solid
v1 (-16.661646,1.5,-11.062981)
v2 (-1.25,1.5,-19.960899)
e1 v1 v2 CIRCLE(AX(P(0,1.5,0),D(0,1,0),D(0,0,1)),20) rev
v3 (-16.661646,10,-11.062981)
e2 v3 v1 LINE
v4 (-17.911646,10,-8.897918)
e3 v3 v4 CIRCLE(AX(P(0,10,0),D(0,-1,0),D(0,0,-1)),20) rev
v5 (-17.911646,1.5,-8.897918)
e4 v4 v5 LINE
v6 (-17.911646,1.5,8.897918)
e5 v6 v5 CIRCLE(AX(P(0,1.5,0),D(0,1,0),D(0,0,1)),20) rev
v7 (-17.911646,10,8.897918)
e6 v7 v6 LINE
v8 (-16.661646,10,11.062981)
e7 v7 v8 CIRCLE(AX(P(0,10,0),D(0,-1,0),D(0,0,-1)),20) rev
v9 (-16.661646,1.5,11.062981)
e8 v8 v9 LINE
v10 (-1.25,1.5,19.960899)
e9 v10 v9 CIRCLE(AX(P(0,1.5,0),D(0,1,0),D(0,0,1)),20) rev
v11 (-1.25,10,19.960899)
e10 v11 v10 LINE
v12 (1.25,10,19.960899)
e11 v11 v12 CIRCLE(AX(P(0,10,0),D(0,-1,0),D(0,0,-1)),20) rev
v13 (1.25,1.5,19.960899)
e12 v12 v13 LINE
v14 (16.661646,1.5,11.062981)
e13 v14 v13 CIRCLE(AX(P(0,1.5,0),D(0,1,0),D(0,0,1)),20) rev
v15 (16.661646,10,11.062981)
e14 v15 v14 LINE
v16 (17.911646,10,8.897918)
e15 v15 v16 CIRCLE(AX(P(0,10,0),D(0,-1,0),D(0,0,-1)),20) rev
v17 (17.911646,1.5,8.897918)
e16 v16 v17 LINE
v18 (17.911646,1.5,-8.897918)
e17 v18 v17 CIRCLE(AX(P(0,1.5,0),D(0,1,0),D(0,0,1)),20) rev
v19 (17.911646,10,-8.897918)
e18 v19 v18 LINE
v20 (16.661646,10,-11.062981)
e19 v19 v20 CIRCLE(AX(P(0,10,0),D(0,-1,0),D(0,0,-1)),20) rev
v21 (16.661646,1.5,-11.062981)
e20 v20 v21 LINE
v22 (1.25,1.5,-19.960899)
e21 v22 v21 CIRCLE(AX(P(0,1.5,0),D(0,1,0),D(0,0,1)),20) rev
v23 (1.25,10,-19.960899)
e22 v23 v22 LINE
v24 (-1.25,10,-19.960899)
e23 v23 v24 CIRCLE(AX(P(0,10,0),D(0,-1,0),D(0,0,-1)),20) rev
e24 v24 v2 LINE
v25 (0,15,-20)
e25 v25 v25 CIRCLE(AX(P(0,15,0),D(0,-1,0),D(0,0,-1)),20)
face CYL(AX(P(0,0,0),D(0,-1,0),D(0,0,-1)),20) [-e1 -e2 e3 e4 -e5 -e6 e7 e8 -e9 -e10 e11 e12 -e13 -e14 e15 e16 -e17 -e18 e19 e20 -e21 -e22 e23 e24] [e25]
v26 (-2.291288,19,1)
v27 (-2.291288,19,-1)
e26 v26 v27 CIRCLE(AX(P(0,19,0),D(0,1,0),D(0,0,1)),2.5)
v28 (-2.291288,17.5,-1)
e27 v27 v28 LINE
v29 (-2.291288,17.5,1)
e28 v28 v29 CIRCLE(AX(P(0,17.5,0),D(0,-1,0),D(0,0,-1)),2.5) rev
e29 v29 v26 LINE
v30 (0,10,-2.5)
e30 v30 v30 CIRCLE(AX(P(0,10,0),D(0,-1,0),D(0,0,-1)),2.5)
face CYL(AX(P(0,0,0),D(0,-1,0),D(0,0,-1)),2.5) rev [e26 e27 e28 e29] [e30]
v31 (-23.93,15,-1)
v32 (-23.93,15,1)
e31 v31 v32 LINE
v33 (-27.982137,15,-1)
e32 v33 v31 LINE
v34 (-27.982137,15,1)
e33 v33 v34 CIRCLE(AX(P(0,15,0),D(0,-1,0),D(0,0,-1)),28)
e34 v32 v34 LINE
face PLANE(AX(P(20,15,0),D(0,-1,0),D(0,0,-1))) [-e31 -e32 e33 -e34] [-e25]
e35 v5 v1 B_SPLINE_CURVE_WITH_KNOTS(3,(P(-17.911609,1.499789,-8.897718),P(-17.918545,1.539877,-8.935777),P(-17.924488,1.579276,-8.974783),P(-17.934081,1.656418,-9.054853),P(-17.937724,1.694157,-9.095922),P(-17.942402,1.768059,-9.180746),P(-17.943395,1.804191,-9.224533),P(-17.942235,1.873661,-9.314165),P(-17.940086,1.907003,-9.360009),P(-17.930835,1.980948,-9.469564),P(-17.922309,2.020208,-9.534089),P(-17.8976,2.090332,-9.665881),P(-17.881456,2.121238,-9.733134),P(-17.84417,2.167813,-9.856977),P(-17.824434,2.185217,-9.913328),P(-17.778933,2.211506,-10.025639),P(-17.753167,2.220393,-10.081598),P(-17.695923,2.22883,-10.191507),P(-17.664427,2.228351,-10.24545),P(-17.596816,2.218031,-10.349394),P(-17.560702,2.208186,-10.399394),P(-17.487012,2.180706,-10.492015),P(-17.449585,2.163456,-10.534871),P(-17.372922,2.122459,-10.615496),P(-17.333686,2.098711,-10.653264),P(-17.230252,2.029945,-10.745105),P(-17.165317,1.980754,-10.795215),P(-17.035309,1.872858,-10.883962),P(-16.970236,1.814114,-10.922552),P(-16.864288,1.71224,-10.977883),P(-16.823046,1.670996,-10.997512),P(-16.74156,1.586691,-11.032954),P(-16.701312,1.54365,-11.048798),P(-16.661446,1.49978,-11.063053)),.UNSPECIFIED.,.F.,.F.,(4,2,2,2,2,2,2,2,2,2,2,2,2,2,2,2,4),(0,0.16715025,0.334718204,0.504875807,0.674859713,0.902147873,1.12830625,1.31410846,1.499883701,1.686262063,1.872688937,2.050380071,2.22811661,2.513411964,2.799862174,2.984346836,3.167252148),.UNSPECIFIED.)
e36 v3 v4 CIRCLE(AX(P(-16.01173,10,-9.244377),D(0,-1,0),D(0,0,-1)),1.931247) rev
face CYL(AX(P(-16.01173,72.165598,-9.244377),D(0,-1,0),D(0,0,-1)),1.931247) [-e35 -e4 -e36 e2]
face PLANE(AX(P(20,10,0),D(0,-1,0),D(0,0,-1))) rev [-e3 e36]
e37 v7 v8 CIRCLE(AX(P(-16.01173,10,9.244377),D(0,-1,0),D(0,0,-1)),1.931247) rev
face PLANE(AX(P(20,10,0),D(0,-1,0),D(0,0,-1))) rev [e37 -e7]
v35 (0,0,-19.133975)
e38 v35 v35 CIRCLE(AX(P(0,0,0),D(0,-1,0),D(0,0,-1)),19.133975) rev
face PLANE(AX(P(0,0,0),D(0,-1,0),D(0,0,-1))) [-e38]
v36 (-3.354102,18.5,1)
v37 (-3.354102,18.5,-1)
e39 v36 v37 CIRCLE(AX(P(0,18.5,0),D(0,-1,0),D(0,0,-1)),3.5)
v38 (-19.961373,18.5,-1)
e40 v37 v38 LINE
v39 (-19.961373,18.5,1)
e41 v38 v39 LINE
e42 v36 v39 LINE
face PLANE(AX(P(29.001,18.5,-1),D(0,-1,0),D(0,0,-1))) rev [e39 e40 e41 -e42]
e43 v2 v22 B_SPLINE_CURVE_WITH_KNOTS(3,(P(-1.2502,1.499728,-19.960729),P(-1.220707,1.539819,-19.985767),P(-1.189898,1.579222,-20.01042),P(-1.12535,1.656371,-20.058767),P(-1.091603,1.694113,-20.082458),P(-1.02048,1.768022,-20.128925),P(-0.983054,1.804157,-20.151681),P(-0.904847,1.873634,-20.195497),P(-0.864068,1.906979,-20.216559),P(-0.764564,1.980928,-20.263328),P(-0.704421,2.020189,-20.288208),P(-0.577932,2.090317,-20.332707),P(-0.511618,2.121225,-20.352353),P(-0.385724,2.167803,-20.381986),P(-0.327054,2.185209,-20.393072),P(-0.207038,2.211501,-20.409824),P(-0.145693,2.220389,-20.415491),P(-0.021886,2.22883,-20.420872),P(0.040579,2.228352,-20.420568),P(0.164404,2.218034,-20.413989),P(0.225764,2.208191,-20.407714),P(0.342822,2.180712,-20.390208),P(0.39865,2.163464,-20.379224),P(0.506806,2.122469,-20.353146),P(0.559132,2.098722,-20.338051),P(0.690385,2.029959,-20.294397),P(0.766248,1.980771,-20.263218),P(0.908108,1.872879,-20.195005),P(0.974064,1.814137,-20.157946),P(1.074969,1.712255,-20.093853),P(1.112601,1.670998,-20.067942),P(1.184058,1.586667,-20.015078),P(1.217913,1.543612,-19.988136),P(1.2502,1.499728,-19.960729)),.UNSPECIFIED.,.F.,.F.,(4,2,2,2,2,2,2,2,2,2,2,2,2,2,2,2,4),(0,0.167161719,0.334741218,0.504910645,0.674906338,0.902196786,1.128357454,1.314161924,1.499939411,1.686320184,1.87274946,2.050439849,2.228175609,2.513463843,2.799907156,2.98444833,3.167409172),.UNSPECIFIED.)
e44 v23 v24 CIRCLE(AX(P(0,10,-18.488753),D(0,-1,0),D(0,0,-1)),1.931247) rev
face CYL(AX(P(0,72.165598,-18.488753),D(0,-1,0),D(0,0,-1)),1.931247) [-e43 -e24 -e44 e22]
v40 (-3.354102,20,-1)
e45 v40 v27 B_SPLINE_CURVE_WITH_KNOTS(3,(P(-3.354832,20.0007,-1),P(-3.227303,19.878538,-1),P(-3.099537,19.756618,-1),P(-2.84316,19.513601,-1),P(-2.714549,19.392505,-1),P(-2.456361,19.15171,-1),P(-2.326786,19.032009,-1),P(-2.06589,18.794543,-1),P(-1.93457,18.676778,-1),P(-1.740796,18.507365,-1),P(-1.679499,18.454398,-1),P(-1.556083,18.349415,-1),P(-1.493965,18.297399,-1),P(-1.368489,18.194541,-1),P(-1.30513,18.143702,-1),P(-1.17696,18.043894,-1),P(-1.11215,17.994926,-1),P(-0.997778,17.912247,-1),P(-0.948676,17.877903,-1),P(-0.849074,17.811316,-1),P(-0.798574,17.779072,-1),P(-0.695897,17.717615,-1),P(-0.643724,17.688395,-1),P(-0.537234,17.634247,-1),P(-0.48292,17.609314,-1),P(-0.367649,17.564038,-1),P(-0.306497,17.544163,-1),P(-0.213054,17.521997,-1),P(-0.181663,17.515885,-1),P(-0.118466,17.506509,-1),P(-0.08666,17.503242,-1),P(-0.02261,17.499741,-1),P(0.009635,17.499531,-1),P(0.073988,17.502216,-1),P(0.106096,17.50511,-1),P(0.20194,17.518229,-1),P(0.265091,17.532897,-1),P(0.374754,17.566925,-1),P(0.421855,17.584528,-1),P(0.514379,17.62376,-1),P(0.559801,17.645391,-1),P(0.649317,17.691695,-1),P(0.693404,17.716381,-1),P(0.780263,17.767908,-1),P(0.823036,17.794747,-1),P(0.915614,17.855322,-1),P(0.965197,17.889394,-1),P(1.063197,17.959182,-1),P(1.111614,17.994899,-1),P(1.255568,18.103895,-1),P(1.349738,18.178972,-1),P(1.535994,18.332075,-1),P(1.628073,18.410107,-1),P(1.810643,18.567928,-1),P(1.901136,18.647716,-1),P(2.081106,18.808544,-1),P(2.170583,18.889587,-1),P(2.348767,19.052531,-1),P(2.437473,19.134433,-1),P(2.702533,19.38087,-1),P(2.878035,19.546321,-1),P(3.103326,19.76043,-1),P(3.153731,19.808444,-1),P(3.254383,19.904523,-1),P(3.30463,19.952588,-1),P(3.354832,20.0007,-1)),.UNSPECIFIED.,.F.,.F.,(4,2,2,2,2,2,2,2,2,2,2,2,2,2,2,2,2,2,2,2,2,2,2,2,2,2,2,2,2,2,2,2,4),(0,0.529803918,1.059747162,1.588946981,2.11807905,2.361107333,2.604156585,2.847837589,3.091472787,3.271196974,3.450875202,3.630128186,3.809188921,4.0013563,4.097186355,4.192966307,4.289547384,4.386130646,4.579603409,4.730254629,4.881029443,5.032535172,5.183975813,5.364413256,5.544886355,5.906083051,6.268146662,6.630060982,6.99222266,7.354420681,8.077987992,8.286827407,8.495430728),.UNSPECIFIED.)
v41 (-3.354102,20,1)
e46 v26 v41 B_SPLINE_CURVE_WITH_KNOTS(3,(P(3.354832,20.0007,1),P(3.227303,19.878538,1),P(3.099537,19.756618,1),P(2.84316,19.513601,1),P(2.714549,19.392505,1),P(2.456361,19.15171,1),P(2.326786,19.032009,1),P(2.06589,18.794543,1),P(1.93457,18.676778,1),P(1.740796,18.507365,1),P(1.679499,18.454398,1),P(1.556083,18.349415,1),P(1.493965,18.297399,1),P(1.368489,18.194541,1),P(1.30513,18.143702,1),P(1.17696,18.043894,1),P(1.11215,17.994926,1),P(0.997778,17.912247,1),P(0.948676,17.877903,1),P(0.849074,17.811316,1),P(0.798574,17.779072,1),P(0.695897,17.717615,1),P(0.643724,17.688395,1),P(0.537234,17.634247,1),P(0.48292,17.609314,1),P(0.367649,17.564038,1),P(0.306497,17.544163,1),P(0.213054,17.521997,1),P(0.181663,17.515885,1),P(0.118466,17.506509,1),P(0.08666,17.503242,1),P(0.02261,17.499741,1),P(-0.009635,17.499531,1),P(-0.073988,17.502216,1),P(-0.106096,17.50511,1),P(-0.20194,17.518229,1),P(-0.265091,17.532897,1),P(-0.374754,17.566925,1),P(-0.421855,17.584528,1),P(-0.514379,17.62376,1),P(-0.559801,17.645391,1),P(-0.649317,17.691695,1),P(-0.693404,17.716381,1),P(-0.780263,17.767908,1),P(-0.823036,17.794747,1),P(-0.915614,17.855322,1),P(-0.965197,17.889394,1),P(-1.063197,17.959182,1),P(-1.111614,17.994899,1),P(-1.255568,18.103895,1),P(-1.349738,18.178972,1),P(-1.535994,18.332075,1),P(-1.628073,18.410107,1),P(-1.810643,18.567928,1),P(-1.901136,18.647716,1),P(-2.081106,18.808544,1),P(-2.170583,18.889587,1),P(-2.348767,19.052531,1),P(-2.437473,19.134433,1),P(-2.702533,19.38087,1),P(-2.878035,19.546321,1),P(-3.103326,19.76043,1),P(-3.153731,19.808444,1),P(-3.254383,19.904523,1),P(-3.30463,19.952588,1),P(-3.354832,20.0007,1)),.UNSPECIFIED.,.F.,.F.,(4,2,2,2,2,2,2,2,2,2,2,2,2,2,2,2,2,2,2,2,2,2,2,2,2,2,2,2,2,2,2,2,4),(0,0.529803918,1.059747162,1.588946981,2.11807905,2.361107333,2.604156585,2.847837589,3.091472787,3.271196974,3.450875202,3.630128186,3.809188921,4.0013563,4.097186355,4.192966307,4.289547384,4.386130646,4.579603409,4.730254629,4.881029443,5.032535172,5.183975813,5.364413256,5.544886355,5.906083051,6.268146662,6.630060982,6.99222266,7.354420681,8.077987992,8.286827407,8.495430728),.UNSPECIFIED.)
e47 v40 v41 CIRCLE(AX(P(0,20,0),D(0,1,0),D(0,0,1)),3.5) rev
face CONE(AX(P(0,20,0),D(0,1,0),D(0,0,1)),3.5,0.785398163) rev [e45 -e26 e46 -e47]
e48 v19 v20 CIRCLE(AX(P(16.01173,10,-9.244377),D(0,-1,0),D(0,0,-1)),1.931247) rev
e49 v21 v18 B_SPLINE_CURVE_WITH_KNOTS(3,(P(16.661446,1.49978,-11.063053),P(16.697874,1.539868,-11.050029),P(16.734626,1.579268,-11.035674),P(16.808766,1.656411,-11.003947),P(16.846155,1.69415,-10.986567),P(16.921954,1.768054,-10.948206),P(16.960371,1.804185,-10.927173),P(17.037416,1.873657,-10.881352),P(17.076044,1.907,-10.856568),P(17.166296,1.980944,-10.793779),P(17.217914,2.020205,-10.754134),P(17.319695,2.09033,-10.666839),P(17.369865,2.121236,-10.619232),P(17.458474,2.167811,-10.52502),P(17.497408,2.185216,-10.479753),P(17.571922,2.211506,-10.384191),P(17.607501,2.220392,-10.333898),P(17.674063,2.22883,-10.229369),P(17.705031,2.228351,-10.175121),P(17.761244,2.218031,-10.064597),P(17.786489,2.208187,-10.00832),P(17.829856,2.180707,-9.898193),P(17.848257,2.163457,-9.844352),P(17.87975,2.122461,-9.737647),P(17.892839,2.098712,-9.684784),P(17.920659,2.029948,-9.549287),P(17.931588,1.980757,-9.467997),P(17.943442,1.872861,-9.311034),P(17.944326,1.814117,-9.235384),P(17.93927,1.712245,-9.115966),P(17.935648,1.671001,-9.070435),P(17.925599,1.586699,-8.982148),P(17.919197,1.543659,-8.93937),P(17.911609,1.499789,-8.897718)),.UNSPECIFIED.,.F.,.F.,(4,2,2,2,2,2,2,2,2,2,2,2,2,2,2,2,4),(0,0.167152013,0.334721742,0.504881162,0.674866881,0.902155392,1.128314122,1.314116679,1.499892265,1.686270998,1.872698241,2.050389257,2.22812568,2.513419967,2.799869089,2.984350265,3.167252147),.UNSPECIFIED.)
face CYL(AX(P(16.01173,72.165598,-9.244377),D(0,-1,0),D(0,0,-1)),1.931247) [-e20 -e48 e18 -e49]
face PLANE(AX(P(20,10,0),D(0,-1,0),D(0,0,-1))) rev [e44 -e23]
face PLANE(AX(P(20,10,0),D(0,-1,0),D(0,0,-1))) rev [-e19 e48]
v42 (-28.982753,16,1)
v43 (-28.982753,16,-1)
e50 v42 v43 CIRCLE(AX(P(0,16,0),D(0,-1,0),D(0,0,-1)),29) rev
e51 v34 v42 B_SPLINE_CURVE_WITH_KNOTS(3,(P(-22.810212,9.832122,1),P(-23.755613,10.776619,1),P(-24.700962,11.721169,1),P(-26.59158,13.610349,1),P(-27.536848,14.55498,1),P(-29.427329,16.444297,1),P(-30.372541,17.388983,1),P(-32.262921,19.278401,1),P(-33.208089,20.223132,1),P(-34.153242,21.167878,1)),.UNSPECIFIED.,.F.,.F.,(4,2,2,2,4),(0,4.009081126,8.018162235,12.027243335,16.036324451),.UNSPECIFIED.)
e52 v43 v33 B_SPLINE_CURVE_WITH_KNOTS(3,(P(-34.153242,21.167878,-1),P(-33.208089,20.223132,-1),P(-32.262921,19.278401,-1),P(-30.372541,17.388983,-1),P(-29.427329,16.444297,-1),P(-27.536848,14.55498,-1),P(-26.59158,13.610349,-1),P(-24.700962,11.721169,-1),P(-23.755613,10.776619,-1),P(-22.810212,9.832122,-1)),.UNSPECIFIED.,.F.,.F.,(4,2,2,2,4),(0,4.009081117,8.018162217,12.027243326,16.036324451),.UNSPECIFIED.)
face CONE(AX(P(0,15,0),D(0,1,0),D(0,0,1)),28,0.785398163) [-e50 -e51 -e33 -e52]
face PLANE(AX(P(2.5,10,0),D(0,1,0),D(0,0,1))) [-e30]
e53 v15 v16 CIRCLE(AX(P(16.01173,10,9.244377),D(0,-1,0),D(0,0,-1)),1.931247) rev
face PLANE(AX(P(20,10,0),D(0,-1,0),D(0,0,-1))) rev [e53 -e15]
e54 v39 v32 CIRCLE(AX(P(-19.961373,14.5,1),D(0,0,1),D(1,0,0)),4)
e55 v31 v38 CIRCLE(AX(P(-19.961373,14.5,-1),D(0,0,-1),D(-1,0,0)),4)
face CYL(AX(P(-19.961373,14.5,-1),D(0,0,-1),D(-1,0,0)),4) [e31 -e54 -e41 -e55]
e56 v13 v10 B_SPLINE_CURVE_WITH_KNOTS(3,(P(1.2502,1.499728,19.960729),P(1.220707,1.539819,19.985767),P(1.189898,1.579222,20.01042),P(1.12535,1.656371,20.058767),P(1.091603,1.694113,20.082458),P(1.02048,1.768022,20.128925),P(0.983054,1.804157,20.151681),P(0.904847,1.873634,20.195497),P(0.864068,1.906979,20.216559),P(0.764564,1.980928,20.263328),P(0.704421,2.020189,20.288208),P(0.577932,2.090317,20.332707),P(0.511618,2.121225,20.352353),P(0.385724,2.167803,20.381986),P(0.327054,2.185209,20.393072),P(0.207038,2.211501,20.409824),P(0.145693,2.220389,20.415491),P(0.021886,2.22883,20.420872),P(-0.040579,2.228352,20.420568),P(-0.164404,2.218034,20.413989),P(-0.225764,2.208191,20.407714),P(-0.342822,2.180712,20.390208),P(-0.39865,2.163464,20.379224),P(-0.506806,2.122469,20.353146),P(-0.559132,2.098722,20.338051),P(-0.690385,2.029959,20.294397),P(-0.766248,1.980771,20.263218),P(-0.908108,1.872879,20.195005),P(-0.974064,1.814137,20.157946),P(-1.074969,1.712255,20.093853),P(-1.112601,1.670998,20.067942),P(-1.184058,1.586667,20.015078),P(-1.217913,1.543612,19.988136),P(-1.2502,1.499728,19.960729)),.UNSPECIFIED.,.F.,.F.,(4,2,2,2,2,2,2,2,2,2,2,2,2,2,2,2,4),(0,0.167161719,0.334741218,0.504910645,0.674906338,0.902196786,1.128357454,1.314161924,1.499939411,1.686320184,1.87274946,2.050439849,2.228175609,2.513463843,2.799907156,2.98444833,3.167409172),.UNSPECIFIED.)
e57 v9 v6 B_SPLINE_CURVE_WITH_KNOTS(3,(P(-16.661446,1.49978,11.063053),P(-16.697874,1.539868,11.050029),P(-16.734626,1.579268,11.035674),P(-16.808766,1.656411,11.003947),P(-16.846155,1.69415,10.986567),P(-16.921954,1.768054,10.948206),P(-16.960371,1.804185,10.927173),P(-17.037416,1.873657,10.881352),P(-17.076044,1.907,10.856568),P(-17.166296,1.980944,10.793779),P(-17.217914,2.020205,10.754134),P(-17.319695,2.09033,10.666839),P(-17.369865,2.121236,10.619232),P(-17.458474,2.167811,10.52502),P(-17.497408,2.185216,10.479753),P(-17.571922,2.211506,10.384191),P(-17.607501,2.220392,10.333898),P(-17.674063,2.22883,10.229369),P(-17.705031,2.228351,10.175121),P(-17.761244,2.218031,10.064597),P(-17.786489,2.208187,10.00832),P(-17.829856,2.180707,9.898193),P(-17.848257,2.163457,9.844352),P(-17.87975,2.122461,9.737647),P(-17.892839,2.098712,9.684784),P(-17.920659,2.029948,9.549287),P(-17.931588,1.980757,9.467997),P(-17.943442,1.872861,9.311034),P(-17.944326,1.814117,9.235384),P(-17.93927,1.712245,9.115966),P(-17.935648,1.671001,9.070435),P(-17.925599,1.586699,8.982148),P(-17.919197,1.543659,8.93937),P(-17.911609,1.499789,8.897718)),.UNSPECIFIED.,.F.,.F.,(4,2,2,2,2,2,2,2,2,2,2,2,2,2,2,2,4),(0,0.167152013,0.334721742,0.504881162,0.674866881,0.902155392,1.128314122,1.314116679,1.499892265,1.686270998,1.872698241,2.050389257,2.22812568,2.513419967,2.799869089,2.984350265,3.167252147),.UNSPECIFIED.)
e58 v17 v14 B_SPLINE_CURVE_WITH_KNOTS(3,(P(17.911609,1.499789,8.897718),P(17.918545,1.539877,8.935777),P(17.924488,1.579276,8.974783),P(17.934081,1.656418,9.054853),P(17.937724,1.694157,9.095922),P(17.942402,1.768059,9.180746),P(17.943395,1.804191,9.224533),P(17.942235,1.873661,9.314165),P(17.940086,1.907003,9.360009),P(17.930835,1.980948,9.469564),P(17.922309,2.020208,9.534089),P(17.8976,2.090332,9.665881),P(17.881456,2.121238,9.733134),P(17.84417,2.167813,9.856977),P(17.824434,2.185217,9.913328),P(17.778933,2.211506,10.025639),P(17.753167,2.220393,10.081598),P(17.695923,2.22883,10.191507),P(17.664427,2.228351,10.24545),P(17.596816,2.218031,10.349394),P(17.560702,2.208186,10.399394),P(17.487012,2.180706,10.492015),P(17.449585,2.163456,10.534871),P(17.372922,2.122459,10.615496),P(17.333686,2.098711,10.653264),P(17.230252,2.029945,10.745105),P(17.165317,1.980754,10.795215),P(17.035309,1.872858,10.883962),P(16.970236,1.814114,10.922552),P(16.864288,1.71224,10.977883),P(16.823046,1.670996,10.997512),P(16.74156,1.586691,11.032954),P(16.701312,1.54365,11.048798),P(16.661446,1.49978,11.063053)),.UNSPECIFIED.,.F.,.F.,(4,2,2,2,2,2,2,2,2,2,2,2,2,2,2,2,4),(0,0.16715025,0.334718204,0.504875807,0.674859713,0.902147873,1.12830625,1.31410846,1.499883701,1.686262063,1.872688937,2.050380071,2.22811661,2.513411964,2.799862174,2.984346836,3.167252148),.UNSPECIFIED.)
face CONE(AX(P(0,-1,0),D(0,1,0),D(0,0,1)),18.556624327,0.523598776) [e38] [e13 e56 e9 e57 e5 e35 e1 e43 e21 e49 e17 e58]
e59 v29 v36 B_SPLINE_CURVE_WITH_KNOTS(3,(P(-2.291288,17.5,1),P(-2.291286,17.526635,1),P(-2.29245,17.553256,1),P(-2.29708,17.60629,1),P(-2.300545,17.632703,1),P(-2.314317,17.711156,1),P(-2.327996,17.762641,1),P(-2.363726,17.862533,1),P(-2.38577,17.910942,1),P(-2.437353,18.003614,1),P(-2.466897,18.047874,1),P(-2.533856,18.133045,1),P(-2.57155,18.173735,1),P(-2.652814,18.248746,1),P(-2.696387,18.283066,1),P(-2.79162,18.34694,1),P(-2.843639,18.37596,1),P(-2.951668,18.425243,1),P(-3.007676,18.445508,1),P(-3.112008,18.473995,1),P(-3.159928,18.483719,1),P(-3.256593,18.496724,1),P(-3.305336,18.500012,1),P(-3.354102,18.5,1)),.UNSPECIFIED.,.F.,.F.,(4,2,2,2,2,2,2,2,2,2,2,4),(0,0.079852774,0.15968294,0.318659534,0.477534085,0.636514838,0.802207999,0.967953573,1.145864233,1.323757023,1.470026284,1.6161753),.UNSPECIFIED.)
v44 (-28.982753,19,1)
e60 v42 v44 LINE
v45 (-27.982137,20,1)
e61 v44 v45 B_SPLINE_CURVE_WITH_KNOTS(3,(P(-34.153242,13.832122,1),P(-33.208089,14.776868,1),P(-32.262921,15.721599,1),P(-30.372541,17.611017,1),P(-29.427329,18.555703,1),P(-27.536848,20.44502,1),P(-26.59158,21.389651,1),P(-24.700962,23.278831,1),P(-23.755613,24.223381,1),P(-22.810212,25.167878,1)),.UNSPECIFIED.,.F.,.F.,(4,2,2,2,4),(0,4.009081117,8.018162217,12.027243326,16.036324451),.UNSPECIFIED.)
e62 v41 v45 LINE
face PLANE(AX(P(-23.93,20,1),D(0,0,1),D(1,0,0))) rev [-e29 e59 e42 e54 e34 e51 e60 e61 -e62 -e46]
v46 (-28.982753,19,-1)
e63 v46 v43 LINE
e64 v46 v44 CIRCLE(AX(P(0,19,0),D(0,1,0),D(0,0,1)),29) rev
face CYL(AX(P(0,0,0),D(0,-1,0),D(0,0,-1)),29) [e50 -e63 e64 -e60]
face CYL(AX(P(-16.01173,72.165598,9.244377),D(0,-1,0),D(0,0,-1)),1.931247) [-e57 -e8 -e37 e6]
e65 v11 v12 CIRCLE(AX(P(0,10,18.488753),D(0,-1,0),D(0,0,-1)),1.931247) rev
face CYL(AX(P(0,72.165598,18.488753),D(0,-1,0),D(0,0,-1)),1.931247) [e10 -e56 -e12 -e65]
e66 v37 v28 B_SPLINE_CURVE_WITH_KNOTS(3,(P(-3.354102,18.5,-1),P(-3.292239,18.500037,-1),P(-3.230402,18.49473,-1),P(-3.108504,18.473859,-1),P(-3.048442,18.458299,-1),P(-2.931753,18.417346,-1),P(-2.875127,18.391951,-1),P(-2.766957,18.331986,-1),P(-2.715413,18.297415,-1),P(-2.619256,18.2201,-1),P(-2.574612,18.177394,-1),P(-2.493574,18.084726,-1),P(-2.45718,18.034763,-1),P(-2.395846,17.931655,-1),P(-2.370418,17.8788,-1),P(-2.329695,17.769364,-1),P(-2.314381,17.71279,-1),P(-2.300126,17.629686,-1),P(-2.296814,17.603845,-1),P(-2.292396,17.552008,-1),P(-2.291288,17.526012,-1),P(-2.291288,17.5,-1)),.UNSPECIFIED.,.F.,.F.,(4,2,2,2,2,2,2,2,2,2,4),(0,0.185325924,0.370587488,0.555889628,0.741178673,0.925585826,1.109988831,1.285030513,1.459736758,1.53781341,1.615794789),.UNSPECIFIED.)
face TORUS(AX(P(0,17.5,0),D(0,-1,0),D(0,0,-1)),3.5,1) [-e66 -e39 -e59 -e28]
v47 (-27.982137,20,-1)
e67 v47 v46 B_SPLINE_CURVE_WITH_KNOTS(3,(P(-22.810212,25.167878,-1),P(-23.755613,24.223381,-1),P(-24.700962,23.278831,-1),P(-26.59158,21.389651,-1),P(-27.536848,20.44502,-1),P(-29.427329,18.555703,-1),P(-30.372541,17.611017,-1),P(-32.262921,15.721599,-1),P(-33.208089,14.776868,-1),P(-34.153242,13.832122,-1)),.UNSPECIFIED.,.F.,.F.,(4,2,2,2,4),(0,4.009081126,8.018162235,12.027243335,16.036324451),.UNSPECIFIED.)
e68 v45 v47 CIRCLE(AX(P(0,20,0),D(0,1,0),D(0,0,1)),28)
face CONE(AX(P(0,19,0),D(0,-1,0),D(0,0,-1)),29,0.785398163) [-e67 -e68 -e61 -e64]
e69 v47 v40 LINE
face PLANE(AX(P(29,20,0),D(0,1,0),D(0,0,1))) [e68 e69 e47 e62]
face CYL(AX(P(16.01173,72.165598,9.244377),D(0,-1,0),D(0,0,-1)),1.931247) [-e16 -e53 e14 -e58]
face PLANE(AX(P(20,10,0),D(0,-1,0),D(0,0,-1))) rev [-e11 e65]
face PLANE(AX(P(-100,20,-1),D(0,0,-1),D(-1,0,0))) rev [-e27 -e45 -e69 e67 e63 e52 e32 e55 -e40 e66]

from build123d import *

# Parameters (mm, degrees)
BOSS_EXTRUDE1_START     = -10
BOSS_EXTRUDE1_DEPTH     = 10
CHAMFER1_SIZE           = 1
SKETCH4_W               = 76.07
SKETCH4_H               = 2
CUT_EXTRUDE1_DEPTH      = 46.628938186
CUT_EXTRUDE2_REACH      = 65.581
CUT_EXTRUDE2_END_RADIUS = 2.5
SKETCH5_W               = 2
SKETCH5_H               = 1.5
FILLET1_R               = 4
FILLET2_R               = 1


with BuildPart() as part:
    # Sketch1 → Revolve1 (revolve)
    with BuildSketch(Plane.XY, mode=Mode.PRIVATE) as revolve1_sk:
        Polygon((0, 0), (20, 0), (20, 15), (29, 15), (29, 20), (2.5, 20), (2.5, 10), (0, 10), align=None)
    revolve(revolve1_sk.sketch.rotate(Axis((0, 0, 0), (0, 1, 0)), 90), axis=Axis((0, 0, 0), (0, 1, 0)))

    # Sketch2 → Boss-Extrude1 (add)
    with BuildSketch(Plane.XZ.offset(BOSS_EXTRUDE1_START)):
        with BuildLine():
            ThreePointArc((-1.25, 19.960899278), (0, 20.42), (1.25, 19.960899278))
            ThreePointArc((1.25, 19.960899278), (10, 17.320508076), (16.661645857, 11.062981394))
            ThreePointArc((16.661645857, 11.062981394), (17.684238745, 10.21), (17.911645857, 8.897917884))
            ThreePointArc((17.911645857, 8.897917884), (20, 0), (17.911645857, -8.897917884))
            ThreePointArc((17.911645857, -8.897917884), (17.684238745, -10.21), (16.661645857, -11.062981394))
            ThreePointArc((16.661645857, -11.062981394), (10, -17.320508076), (1.25, -19.960899278))
            ThreePointArc((1.25, -19.960899278), (0, -20.42), (-1.25, -19.960899278))
            ThreePointArc((-1.25, -19.960899278), (-10, -17.320508076), (-16.661645857, -11.062981394))
            ThreePointArc((-16.661645857, -11.062981394), (-17.684238745, -10.21), (-17.911645857, -8.897917884))
            ThreePointArc((-17.911645857, -8.897917884), (-20, 0), (-17.911645857, 8.897917884))
            ThreePointArc((-17.911645857, 8.897917884), (-17.684238745, 10.21), (-16.661645857, 11.062981394))
            ThreePointArc((-16.661645857, 11.062981394), (-10, 17.320508076), (-1.25, 19.960899278))
        make_face()
    extrude(amount=BOSS_EXTRUDE1_DEPTH)

    # Sketch3 → Cut-Revolve1 (revolve, cut)
    with BuildSketch(Plane.XY, mode=Mode.PRIVATE) as cut_revolve1_sk:
        Polygon((-21, 3.232050808), (-18.556624327, -1), (-21, -1), align=None)
    revolve(cut_revolve1_sk.sketch.rotate(Axis((0, 29.336873575, 0), (0, -1, 0)), 273.58332148), axis=Axis((0, 29.336873575, 0), (0, -1, 0)), mode=Mode.SUBTRACT)

    # Chamfer1
    chamfer1_edges = [part.edges().sort_by_distance(p)[0] for p in [
        (0, 20, 2.5),
        (0, 20, 29),
        (0, 15, 29),
    ]]
    chamfer(chamfer1_edges, length=CHAMFER1_SIZE)

    # Sketch4 → Cut-Extrude1 (cut, through all)
    with BuildSketch(Plane.XZ):
        with Locations((-61.965, 0)):
            Rectangle(SKETCH4_W, SKETCH4_H)
    extrude(amount=-CUT_EXTRUDE1_DEPTH, mode=Mode.SUBTRACT)

    # Cut-Extrude2: up to this cylinder (the profile starts outside it)
    cut_extrude2_end = Plane(origin=(0, 19.25, 0), z_dir=(0, -1, 0)) * Cylinder(CUT_EXTRUDE2_END_RADIUS, 137.162, mode=Mode.PRIVATE)
    # Sketch5 → Cut-Extrude2 (cut, up to the surface)
    with BuildSketch(Plane.ZY.offset(23.93), mode=Mode.PRIVATE) as cut_extrude2_sk1:
        with Locations((0, 19.25)):
            Rectangle(SKETCH5_W, SKETCH5_H)
    cut_extrude2_tool1 = extrude(cut_extrude2_sk1.sketch, amount=-CUT_EXTRUDE2_REACH, mode=Mode.PRIVATE) - cut_extrude2_end
    add(cut_extrude2_tool1.solids().sort_by_distance((-23.93, 19.25, 0))[0], mode=Mode.SUBTRACT)

    # Fillet1
    # the kernel refuses this fillet: 4 mm, written as the material it takes off along each edge
    with BuildSketch(Plane(origin=(-23.93, 18.5, 1), x_dir=(1, 0, 0), z_dir=(0, 0, -1))) as fillet1_piece_1:
        with BuildLine():
            CenterArc((3.968626967, 4), FILLET1_R, 187.180755781, 82.819244219)
            Line((0, 3.5), (-0.079372539, 3.49))
            ThreePointArc((-0.079372539, 3.49), (-0.08, 1.75), (-0.08, 0))
            Line((-0.08, 0), (0, -0.08))
            Line((0, -0.08), (3.968626967, -0.08))
            Line((3.968626967, -0.08), (3.968626967, 0))
        make_face()
    extrude(amount=2, mode=Mode.SUBTRACT)

    # Fillet2
    fillet2_edges = [part.edges().sort_by_distance(p)[0] for p in [
        (-2.5, 18.5, 0),
    ]]
    fillet(fillet2_edges, radius=FILLET2_R)


solid = part.part
